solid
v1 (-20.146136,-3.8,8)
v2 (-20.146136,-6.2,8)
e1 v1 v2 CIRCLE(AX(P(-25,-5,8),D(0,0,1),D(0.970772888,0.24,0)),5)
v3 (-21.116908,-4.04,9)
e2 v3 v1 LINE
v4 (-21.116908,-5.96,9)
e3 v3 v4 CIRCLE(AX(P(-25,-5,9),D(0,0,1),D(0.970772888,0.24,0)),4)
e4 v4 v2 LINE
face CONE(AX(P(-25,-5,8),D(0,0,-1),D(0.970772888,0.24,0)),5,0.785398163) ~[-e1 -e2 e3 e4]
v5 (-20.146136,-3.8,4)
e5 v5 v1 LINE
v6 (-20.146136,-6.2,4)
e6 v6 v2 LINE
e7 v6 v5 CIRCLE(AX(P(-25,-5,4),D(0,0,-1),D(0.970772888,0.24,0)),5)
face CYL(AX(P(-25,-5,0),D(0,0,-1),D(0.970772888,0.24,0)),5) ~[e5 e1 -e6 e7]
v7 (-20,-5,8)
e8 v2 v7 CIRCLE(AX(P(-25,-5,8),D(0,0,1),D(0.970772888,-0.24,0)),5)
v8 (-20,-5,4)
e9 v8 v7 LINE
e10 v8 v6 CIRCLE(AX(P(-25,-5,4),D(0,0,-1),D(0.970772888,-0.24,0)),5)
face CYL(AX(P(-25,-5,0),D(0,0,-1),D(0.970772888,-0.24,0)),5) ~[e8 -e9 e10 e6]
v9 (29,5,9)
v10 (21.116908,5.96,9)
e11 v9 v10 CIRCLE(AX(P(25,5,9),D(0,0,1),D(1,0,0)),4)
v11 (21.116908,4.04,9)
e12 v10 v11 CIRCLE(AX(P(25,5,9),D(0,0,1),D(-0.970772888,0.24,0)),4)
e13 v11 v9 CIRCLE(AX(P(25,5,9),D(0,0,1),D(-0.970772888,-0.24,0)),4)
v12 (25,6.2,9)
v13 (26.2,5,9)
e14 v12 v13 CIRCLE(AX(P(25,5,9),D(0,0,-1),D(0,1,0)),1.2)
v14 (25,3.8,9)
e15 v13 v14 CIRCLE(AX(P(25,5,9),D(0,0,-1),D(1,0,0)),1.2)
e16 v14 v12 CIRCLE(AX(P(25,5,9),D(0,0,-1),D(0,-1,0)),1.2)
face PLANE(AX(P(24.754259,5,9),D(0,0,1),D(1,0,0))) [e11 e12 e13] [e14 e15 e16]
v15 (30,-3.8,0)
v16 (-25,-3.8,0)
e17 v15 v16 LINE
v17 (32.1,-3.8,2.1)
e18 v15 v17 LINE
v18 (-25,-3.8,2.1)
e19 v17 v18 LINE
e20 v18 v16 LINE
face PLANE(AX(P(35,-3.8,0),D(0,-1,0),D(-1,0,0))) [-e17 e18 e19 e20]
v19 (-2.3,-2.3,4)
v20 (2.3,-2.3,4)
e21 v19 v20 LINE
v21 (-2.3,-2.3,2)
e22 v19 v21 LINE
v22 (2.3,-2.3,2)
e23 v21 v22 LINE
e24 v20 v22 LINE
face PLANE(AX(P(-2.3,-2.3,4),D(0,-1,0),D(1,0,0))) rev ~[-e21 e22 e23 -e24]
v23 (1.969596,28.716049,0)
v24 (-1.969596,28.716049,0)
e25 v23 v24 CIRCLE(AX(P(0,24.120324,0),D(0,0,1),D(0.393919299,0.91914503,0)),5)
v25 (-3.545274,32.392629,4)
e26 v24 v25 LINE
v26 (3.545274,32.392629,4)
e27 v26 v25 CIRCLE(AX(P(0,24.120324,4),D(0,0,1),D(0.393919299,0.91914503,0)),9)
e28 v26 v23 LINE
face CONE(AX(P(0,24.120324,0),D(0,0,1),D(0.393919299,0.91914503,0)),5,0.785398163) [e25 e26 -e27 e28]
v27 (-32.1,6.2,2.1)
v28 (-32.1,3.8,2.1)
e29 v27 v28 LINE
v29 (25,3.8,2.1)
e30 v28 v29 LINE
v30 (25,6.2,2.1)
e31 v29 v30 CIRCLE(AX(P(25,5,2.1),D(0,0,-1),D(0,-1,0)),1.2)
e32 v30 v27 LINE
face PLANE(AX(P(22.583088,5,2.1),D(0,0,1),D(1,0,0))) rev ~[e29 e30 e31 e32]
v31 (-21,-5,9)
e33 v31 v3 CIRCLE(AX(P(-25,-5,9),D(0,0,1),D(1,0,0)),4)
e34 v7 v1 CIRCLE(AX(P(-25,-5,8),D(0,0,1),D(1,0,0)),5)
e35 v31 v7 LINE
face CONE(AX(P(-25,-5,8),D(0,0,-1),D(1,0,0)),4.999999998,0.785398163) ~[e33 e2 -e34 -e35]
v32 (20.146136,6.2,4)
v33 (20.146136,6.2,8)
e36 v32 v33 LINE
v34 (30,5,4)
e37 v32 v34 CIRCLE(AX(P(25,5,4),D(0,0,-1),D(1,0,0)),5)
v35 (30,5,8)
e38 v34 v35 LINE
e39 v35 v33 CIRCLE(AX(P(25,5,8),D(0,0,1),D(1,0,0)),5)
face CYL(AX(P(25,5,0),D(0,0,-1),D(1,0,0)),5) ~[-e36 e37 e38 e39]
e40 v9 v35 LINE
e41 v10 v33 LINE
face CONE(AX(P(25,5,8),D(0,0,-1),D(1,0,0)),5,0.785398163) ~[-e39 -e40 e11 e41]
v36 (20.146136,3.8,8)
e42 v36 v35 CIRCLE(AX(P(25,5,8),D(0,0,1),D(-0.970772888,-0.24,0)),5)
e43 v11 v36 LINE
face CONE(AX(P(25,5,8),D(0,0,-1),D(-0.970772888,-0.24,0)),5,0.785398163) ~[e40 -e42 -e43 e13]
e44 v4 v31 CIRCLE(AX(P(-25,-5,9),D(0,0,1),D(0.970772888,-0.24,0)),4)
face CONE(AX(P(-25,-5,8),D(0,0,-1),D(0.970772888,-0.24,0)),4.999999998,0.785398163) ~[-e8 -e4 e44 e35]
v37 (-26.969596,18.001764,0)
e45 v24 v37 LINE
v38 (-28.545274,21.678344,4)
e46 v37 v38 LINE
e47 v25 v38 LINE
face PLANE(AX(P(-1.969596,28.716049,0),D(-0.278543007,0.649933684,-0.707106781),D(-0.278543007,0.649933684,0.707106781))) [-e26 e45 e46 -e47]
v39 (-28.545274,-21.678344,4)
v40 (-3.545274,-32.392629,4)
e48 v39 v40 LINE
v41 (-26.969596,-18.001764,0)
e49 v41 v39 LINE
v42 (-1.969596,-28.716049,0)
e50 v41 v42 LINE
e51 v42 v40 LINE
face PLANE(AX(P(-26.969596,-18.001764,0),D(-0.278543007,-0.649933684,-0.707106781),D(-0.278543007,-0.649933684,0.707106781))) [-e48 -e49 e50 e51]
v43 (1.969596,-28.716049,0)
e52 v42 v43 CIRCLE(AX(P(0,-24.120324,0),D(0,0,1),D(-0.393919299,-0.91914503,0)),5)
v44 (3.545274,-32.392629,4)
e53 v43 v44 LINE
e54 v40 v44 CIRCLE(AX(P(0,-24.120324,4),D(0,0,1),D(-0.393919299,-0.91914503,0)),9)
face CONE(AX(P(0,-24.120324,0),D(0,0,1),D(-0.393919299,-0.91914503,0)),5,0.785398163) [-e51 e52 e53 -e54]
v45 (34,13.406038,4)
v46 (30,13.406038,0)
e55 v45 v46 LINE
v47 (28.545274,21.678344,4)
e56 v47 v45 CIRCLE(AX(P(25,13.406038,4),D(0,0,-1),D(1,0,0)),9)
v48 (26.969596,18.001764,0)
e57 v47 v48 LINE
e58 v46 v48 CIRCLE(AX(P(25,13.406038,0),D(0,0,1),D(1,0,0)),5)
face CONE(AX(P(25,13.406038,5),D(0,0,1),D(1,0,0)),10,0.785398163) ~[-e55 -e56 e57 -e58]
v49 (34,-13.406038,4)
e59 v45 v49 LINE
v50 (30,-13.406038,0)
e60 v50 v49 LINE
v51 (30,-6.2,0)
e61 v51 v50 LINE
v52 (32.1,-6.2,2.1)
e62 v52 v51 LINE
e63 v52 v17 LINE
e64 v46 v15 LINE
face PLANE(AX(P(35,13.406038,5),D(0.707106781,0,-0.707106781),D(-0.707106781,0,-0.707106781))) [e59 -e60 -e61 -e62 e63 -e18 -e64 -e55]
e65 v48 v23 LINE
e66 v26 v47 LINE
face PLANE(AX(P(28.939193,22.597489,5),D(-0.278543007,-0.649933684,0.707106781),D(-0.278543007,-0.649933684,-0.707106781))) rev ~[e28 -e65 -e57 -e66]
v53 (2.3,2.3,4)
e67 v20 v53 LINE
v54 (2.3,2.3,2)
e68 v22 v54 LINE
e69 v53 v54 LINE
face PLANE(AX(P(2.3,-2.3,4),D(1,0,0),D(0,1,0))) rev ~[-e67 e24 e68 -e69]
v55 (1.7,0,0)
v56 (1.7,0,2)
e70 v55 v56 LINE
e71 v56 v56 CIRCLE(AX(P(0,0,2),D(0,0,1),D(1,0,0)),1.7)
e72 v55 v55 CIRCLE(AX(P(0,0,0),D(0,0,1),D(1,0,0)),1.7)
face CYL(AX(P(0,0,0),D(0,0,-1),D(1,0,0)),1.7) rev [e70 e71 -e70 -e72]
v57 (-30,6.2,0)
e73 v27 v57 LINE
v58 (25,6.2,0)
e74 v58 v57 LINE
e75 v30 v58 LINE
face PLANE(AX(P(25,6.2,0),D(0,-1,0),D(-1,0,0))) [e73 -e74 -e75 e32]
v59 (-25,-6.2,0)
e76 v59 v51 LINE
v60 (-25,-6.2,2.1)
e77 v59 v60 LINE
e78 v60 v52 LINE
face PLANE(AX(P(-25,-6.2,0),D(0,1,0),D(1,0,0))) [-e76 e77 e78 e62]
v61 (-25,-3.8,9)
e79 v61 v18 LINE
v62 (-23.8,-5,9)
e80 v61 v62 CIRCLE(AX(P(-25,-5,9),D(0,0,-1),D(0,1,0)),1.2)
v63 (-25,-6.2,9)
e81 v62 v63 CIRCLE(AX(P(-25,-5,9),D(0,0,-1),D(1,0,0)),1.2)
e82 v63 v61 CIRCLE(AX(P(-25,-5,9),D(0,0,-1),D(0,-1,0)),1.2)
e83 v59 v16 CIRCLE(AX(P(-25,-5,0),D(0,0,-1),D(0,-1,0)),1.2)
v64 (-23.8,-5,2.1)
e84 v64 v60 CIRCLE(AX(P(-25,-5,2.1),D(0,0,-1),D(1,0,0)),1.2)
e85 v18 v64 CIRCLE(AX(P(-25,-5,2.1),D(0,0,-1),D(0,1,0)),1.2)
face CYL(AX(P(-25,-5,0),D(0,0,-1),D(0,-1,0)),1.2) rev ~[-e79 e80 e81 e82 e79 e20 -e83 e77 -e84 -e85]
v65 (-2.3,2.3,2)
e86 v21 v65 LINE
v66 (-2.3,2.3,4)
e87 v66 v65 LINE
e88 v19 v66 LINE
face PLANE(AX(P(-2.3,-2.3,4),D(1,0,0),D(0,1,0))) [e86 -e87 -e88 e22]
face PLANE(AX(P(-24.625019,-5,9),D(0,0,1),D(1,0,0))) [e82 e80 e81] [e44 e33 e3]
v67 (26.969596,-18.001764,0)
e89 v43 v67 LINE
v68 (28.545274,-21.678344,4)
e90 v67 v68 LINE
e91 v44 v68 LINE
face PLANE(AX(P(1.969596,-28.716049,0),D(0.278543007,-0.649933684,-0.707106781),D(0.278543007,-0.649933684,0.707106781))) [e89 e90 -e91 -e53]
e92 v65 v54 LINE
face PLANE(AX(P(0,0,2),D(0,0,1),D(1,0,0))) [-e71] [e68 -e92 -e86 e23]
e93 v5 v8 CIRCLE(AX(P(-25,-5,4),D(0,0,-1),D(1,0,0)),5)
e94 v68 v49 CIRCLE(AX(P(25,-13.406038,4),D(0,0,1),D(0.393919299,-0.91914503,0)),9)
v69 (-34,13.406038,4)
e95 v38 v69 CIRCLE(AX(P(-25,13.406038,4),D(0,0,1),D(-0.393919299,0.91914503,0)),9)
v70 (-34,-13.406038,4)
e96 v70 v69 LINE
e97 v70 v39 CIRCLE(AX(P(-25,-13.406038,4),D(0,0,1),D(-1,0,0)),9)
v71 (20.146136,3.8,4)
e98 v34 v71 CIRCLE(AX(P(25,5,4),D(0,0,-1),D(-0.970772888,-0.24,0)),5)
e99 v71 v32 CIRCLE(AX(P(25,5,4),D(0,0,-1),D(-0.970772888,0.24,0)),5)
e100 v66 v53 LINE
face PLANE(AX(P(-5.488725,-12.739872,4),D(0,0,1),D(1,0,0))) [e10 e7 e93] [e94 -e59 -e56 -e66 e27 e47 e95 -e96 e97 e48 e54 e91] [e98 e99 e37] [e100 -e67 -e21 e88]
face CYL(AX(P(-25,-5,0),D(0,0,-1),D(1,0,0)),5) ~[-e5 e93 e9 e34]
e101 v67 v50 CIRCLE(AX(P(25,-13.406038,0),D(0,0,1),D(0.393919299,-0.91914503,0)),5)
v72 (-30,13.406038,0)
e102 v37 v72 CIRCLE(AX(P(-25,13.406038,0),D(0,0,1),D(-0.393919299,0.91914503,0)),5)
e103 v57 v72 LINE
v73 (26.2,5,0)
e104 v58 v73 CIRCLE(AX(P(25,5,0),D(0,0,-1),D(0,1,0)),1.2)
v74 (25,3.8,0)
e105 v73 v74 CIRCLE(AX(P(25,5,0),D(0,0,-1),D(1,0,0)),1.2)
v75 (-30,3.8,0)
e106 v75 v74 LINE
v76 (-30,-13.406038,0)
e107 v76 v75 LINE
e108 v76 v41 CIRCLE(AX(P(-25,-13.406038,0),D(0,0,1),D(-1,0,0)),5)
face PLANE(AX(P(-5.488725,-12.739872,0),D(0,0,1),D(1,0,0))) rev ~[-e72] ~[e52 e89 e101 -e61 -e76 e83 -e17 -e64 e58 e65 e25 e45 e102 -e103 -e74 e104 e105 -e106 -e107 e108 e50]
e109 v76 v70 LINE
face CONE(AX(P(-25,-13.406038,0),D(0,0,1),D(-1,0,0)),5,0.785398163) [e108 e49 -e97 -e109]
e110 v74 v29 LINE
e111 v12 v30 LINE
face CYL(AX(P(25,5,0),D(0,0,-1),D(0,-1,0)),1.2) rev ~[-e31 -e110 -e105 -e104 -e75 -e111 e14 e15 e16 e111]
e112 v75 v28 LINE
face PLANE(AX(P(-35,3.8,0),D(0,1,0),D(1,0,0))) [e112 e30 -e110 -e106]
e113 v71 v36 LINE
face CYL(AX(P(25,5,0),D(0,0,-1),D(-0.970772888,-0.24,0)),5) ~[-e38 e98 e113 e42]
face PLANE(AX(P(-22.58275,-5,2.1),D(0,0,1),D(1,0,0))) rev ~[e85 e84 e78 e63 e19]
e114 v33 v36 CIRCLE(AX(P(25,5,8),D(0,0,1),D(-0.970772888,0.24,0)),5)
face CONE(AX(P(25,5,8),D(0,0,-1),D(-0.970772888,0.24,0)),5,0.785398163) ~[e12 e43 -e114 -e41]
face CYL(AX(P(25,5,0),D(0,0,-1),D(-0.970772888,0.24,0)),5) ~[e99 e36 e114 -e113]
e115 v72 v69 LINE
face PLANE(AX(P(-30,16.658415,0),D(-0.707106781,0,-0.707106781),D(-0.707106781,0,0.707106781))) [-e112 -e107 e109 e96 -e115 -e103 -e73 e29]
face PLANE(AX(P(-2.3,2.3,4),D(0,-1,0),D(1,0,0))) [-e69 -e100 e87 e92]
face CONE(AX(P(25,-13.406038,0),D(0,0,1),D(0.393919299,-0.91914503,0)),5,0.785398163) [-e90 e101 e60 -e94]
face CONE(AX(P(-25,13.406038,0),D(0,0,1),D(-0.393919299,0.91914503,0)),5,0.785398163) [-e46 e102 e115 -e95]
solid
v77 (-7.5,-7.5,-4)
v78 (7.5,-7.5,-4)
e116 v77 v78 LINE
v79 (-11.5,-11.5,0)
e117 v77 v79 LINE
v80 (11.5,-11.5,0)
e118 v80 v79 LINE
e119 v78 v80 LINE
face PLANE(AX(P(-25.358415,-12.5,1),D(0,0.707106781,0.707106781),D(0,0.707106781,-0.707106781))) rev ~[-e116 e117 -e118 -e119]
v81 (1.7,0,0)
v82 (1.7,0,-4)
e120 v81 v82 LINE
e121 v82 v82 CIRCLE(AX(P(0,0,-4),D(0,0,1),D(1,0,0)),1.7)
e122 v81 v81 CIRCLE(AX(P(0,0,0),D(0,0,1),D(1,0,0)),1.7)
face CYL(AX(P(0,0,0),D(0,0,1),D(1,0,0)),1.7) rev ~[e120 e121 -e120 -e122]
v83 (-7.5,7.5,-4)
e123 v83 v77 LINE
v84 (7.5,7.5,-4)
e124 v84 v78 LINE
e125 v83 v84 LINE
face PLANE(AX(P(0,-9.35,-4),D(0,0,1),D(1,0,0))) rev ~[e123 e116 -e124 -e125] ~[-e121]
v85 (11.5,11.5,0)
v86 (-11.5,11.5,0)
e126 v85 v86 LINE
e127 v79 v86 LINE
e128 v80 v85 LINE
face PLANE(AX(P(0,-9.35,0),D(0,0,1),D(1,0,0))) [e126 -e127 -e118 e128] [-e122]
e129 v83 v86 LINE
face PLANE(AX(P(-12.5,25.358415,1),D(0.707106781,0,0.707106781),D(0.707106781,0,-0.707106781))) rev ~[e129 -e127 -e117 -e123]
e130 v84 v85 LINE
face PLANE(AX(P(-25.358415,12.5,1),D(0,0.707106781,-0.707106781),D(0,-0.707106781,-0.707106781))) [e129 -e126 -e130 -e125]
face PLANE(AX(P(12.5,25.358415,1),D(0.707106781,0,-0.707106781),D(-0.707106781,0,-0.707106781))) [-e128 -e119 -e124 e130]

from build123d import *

# Parameters (mm, degrees)
F0_W           = 25
F0_H           = 6.3
F0_H_2         = 2.4
F0_H_3         = 7.6
F0_R           = 1.7
F0_W_2         = 22.5
F1_DEPTH       = 4
F2_DEPTH       = 9
F3_DEPTH       = 2.1
F4_DEPTH       = 4
F5_T1_DEPTH    = 50.7168298797
F5_T3_DEPTH    = 50.7168298797
F5_2_T1_DEPTH  = 27.1991896638
F5_2_T3_DEPTH  = 20.06445336
F5_2_T5_DEPTH  = 27.1991896638
F5_2_T7_DEPTH  = 30.06445336
F5_2_T9_DEPTH  = 27.1991896638
F5_2_T11_DEPTH = 20.06445336
F5_2_T13_DEPTH = 27.1991896638
F5_2_T15_DEPTH = 30.06445336
F5_2_T18_ANGLE = 66.8014094864
F5_2_T20_ANGLE = 46.3971810273
F5_2_T22_ANGLE = 66.8014094864
F5_2_T24_ANGLE = 66.8014094864
F5_2_T26_ANGLE = 46.3971810273
F5_2_T28_ANGLE = 66.8014094864
F6_SIZE        = 1
F7_W           = 4.6
F7_H           = 4.6
F7_R           = 1.7
F8_DEPTH       = 2


# Not quite as in the source:
# - a fillet or chamfer that OpenCascade refuses, or shapes differently, is made with other operations: its cross-section is extruded or revolved along the edge and cut away or added


with BuildPart() as f1:
    # F0 (on Top) → F1 (new body)
    with BuildSketch(Plane.XY):
        with BuildLine():
            Line((-12.5, -3.8), (-12.5, 3.8))
            Line((-12.5, 3.8), (-35, 3.8))
            Line((-35, 3.8), (-35, 0.3032439272))
            Line((-35, 0.3032439272), (-35, -0.3032439272))
            Line((-35, -0.3032439272), (-35, -13.4060384202))
            ThreePointArc((-35, -13.4060384202), (-33.3484109224, -18.9109485077), (-28.9391929858, -22.5974887204))
            Line((-28.9391929858, -22.5974887204), (-3.9391929858, -33.3117744347))
            ThreePointArc((-3.9391929858, -33.3117744347), (0, -34.1203241345), (3.9391929858, -33.3117744347))
            Line((3.9391929858, -33.3117744347), (28.9391929858, -22.5974887204))
            ThreePointArc((28.9391929858, -22.5974887204), (33.3484109224, -18.9109485077), (35, -13.4060384202))
            Line((35, -13.4060384202), (35, -6.2))
            Line((35, -6.2), (12.5, -6.2))
            Line((12.5, -6.2), (12.5, -12.5))
            Line((12.5, -12.5), (-12.5, -12.5))
            Line((-12.5, -12.5), (-12.5, -6.2))
            Line((-12.5, -6.2), (-20.1461355602, -6.2))
            ThreePointArc((-20.1461355602, -6.2), (-30, -5), (-20.1461355602, -3.8))
            Line((-20.1461355602, -3.8), (-12.5, -3.8))
        make_face()
        with BuildLine():
            ThreePointArc((20.1461355602, 6.2), (25.6044327096, 9.9633316532), (30, 5))
            ThreePointArc((30, 5), (25.6044327096, 0.0366683468), (20.1461355602, 3.8))
            Line((20.1461355602, 3.8), (12.5, 3.8))
            Line((12.5, 3.8), (12.5, -3.8))
            Line((12.5, -3.8), (35, -3.8))
            Line((35, -3.8), (35, -0.49606018))
            Line((35, -0.49606018), (35, 0.49606018))
            Line((35, 0.49606018), (35, 13.4060384202))
            ThreePointArc((35, 13.4060384202), (33.3484109224, 18.9109485077), (28.9391929858, 22.5974887204))
            Line((28.9391929858, 22.5974887204), (3.9391929858, 33.3117744347))
            ThreePointArc((3.9391929858, 33.3117744347), (0, 34.1203241345), (-3.9391929858, 33.3117744347))
            Line((-3.9391929858, 33.3117744347), (-28.9391929858, 22.5974887204))
            ThreePointArc((-28.9391929858, 22.5974887204), (-33.3484109224, 18.9109485077), (-35, 13.4060384202))
            Line((-35, 13.4060384202), (-35, 6.2))
            Line((-35, 6.2), (-12.5, 6.2))
            Line((-12.5, 6.2), (-12.5, 12.5))
            Line((-12.5, 12.5), (12.5, 12.5))
            Line((12.5, 12.5), (12.5, 6.2))
            Line((12.5, 6.2), (20.1461355602, 6.2))
        make_face()
        with BuildLine():
            ThreePointArc((20.1461355602, 3.8), (25.6044327096, 0.0366683468), (30, 5))
            ThreePointArc((30, 5), (25.6044327096, 9.9633316532), (20.1461355602, 6.2))
            Line((20.1461355602, 6.2), (25, 6.2))
            ThreePointArc((25, 6.2), (25.8485281374, 5.8485281374), (26.2, 5))
            ThreePointArc((26.2, 5), (25.8485281374, 4.1514718626), (25, 3.8))
            Line((25, 3.8), (20.1461355602, 3.8))
        make_face()
        with BuildLine():
            Line((25, 6.2), (20.1461355602, 6.2))
            ThreePointArc((20.1461355602, 6.2), (20, 5), (20.1461355602, 3.8))
            Line((20.1461355602, 3.8), (25, 3.8))
            ThreePointArc((25, 3.8), (23.8, 5), (25, 6.2))
        make_face()
        with BuildLine():
            ThreePointArc((20.1461355602, 3.8), (20, 5), (20.1461355602, 6.2))
            Line((20.1461355602, 6.2), (12.5, 6.2))
            Line((12.5, 6.2), (12.5, 3.8))
            Line((12.5, 3.8), (20.1461355602, 3.8))
        make_face()
        with Locations((0, 9.35)):
            Rectangle(F0_W, F0_H)
        with Locations((0, 5)):
            Rectangle(F0_W, F0_H_2)
        Rectangle(F0_W, F0_H_3)
        Circle(F0_R, mode=Mode.SUBTRACT)
        with Locations((-23.75, 5)):
            Rectangle(F0_W_2, F0_H_2)
        with BuildLine():
            Line((-25, -3.8), (-20.1461355602, -3.8))
            ThreePointArc((-20.1461355602, -3.8), (-30, -5), (-20.1461355602, -6.2))
            Line((-20.1461355602, -6.2), (-25, -6.2))
            ThreePointArc((-25, -6.2), (-26.2, -5), (-25, -3.8))
        make_face()
        with BuildLine():
            ThreePointArc((-20, -5), (-20.0366683468, -4.3955672904), (-20.1461355602, -3.8))
            Line((-20.1461355602, -3.8), (-25, -3.8))
            ThreePointArc((-25, -3.8), (-24.1514718626, -4.1514718626), (-23.8, -5))
            ThreePointArc((-23.8, -5), (-24.1514718626, -5.8485281374), (-25, -6.2))
            Line((-25, -6.2), (-20.1461355602, -6.2))
            ThreePointArc((-20.1461355602, -6.2), (-20.0366683468, -5.6044327096), (-20, -5))
        make_face()
        with Locations((23.75, -5)):
            Rectangle(F0_W_2, F0_H_2)
        with Locations((0, -9.35)):
            Rectangle(F0_W, F0_H)
        with BuildLine():
            Line((-12.5, -6.2), (-12.5, -3.8))
            Line((-12.5, -3.8), (-20.1461355602, -3.8))
            ThreePointArc((-20.1461355602, -3.8), (-20.0366683468, -4.3955672904), (-20, -5))
            ThreePointArc((-20, -5), (-20.0366683468, -5.6044327096), (-20.1461355602, -6.2))
            Line((-20.1461355602, -6.2), (-12.5, -6.2))
        make_face()
        with Locations((0, -5)):
            Rectangle(F0_W, F0_H_2)
    extrude(amount=F1_DEPTH)

    # F0 (on Top) → F2 (join)
    with BuildSketch(Plane.XY):
        with BuildLine():
            Line((-25, -3.8), (-20.1461355602, -3.8))
            ThreePointArc((-20.1461355602, -3.8), (-30, -5), (-20.1461355602, -6.2))
            Line((-20.1461355602, -6.2), (-25, -6.2))
            ThreePointArc((-25, -6.2), (-26.2, -5), (-25, -3.8))
        make_face()
        with BuildLine():
            ThreePointArc((20.1461355602, 3.8), (25.6044327096, 0.0366683468), (30, 5))
            ThreePointArc((30, 5), (25.6044327096, 9.9633316532), (20.1461355602, 6.2))
            Line((20.1461355602, 6.2), (25, 6.2))
            ThreePointArc((25, 6.2), (25.8485281374, 5.8485281374), (26.2, 5))
            ThreePointArc((26.2, 5), (25.8485281374, 4.1514718626), (25, 3.8))
            Line((25, 3.8), (20.1461355602, 3.8))
        make_face()
        with BuildLine():
            Line((25, 6.2), (20.1461355602, 6.2))
            ThreePointArc((20.1461355602, 6.2), (20, 5), (20.1461355602, 3.8))
            Line((20.1461355602, 3.8), (25, 3.8))
            ThreePointArc((25, 3.8), (23.8, 5), (25, 6.2))
        make_face()
        with BuildLine():
            ThreePointArc((-20, -5), (-20.0366683468, -4.3955672904), (-20.1461355602, -3.8))
            Line((-20.1461355602, -3.8), (-25, -3.8))
            ThreePointArc((-25, -3.8), (-24.1514718626, -4.1514718626), (-23.8, -5))
            ThreePointArc((-23.8, -5), (-24.1514718626, -5.8485281374), (-25, -6.2))
            Line((-25, -6.2), (-20.1461355602, -6.2))
            ThreePointArc((-20.1461355602, -6.2), (-20.0366683468, -5.6044327096), (-20, -5))
        make_face()
    extrude(amount=F2_DEPTH)

    # F0 (on Top) → F3 (cut)
    with BuildSketch(Plane.XY):
        with BuildLine():
            ThreePointArc((-20, -5), (-20.0366683468, -4.3955672904), (-20.1461355602, -3.8))
            Line((-20.1461355602, -3.8), (-25, -3.8))
            ThreePointArc((-25, -3.8), (-24.1514718626, -4.1514718626), (-23.8, -5))
            ThreePointArc((-23.8, -5), (-24.1514718626, -5.8485281374), (-25, -6.2))
            Line((-25, -6.2), (-20.1461355602, -6.2))
            ThreePointArc((-20.1461355602, -6.2), (-20.0366683468, -5.6044327096), (-20, -5))
        make_face()
        with BuildLine():
            Line((-12.5, -6.2), (-12.5, -3.8))
            Line((-12.5, -3.8), (-20.1461355602, -3.8))
            ThreePointArc((-20.1461355602, -3.8), (-20.0366683468, -4.3955672904), (-20, -5))
            ThreePointArc((-20, -5), (-20.0366683468, -5.6044327096), (-20.1461355602, -6.2))
            Line((-20.1461355602, -6.2), (-12.5, -6.2))
        make_face()
        with Locations((0, -5)):
            Rectangle(F0_W, F0_H_2)
        with Locations((23.75, -5)):
            Rectangle(F0_W_2, F0_H_2)
        with BuildLine():
            Line((25, 6.2), (20.1461355602, 6.2))
            ThreePointArc((20.1461355602, 6.2), (20, 5), (20.1461355602, 3.8))
            Line((20.1461355602, 3.8), (25, 3.8))
            ThreePointArc((25, 3.8), (23.8, 5), (25, 6.2))
        make_face()
        with BuildLine():
            ThreePointArc((20.1461355602, 3.8), (20, 5), (20.1461355602, 6.2))
            Line((20.1461355602, 6.2), (12.5, 6.2))
            Line((12.5, 6.2), (12.5, 3.8))
            Line((12.5, 3.8), (20.1461355602, 3.8))
        make_face()
        with Locations((0, 5)):
            Rectangle(F0_W, F0_H_2)
        with Locations((-23.75, 5)):
            Rectangle(F0_W_2, F0_H_2)
    extrude(amount=F3_DEPTH, mode=Mode.SUBTRACT)

    # F5#2: chamfer of 5 on 2 edges, made by hand

    # F5_2_s2 → F5_2_t1 (cut)
    with BuildSketch(Plane(origin=(8.7332208073, 3.7428089174, 0), x_dir=(0, 0, 1), z_dir=(-0.91914503, -0.3939192986, 0))):
        Polygon((0, 27.1700760506), (5, 32.1700760506), (0, 32.1700760506), align=None)
    extrude(amount=F5_2_T1_DEPTH, mode=Mode.SUBTRACT)

    # F5_2_s4 → F5_2_t3 (cut)
    with BuildSketch(Plane.XZ.offset(-13.4060384202)):
        Polygon((-30, 0), (-35, 5), (-35, 0), align=None)
    extrude(amount=F5_2_T3_DEPTH, mode=Mode.SUBTRACT)

    # F5_2_s6 → F5_2_t5 (cut)
    with BuildSketch(Plane(origin=(16.2667791927, -6.9714767969, 0), x_dir=(0, 0, 1), z_dir=(-0.91914503, 0.3939192986, 0))):
        Polygon((5, 32.1700760506), (0, 27.1700760506), (0, 32.1700760506), align=None)
    extrude(amount=F5_2_T5_DEPTH, mode=Mode.SUBTRACT)

    # F5_2_s8 → F5_2_t7 (cut)
    with BuildSketch(Plane.XZ.offset(-13.4060384202)):
        Polygon((35, 5), (30, 0), (35, 0), align=None)
    extrude(amount=F5_2_T7_DEPTH, mode=Mode.SUBTRACT)

    # F5_2_s10 → F5_2_t9 (cut)
    with BuildSketch(Plane(origin=(-8.7332208073, -3.7428089174, 0), x_dir=(0, 0, 1), z_dir=(0.91914503, 0.3939192986, 0))):
        Polygon((0, 27.1700760506), (5, 32.1700760506), (0, 32.1700760506), align=None)
    extrude(amount=F5_2_T9_DEPTH, mode=Mode.SUBTRACT)

    # F5_2_s12 → F5_2_t11 (cut)
    with BuildSketch(Plane.XZ.offset(-6.6584149398)):
        Polygon((35, 5), (30, 0), (35, 0), align=None)
    extrude(amount=F5_2_T11_DEPTH, mode=Mode.SUBTRACT)

    # F5_2_s14 → F5_2_t13 (cut)
    with BuildSketch(Plane(origin=(-16.2667791927, 6.9714767969, 0), x_dir=(0, 0, 1), z_dir=(0.91914503, -0.3939192986, 0))):
        Polygon((0, 27.1700760506), (5, 32.1700760506), (0, 32.1700760506), align=None)
    extrude(amount=F5_2_T13_DEPTH, mode=Mode.SUBTRACT)

    # F5_2_s16 → F5_2_t15 (cut)
    with BuildSketch(Plane.XZ.offset(-16.6584149398)):
        Polygon((-30, 0), (-35, 5), (-35, 0), align=None)
    extrude(amount=F5_2_T15_DEPTH, mode=Mode.SUBTRACT)

    # F5_2_s17 → F5_2_t18 (revolve, cut)
    with BuildSketch(Plane(origin=(16.2667791927, 6.9714767969, 0), x_dir=(0, 0, 1), z_dir=(-0.91914503, -0.3939192986, 0))):
        Polygon((0, -27.1700760506), (5, -32.1700760506), (0, -32.1700760506), align=None)
    revolve(axis=Axis((25, -13.4060384202, 0), (0, 0, 1)), revolution_arc=F5_2_T18_ANGLE, mode=Mode.SUBTRACT)

    # F5_2_s19 → F5_2_t20 (revolve, cut)
    with BuildSketch(Plane(origin=(-8.7332208073, 3.7428089174, 0), x_dir=(0, 0, 1), z_dir=(0.91914503, -0.3939192986, 0))):
        Polygon((0, -27.1700760506), (5, -32.1700760506), (0, -32.1700760506), align=None)
    revolve(axis=Axis((0, 24.1203241345, 0), (0, 0, 1)), revolution_arc=F5_2_T20_ANGLE, mode=Mode.SUBTRACT)

    # F5_2_s21 → F5_2_t22 (revolve, cut)
    with BuildSketch(Plane(origin=(-16.2667791927, -6.9714767969, 0), x_dir=(0, 0, 1), z_dir=(0.91914503, 0.3939192986, 0))):
        Polygon((0, -27.1700760506), (5, -32.1700760506), (0, -32.1700760506), align=None)
    revolve(axis=Axis((-25, 13.4060384202, 0), (0, 0, 1)), revolution_arc=F5_2_T22_ANGLE, mode=Mode.SUBTRACT)

    # F5_2_s23 → F5_2_t24 (revolve, cut)
    with BuildSketch(Plane.XZ.offset(-13.4060384202)):
        Polygon((35, 5), (30, 0), (35, 0), align=None)
    revolve(axis=Axis((25, 13.4060384202, 0), (0, 0, 1)), revolution_arc=F5_2_T24_ANGLE, mode=Mode.SUBTRACT)

    # F5_2_s25 → F5_2_t26 (revolve, cut)
    with BuildSketch(Plane(origin=(8.7332208073, -3.7428089174, 0), x_dir=(0, 0, 1), z_dir=(-0.91914503, 0.3939192986, 0))):
        Polygon((0, -27.1700760506), (5, -32.1700760506), (0, -32.1700760506), align=None)
    revolve(axis=Axis((0, -24.1203241345, 0), (0, 0, 1)), revolution_arc=F5_2_T26_ANGLE, mode=Mode.SUBTRACT)

    # F5_2_s27 → F5_2_t28 (revolve, cut)
    with BuildSketch(Plane.XZ.offset(13.4060384202)):
        Polygon((-30, 0), (-35, 5), (-35, 0), align=None)
    revolve(axis=Axis((-25, -13.4060384202, 0), (0, 0, 1)), revolution_arc=F5_2_T28_ANGLE, mode=Mode.SUBTRACT)

    # F6
    f6_edges = [f1.edges().sort_by_distance(p)[0] for p in [
        (29.853864, 3.8, 9),
        (-29.853864, -3.8, 9),
    ]]
    chamfer(f6_edges, length=F6_SIZE)

    # F7 (on face) → F8 (cut)
    with BuildSketch(Plane.XY.offset(4)):
        Rectangle(F7_W, F7_H)
        Circle(F7_R, mode=Mode.SUBTRACT)
    extrude(amount=-F8_DEPTH, mode=Mode.SUBTRACT)


with BuildPart() as f4:
    # F0 (on Top) → F4 (new body)
    with BuildSketch(Plane.XY):
        with Locations((0, -9.35)):
            Rectangle(F0_W, F0_H)
        with Locations((0, -5)):
            Rectangle(F0_W, F0_H_2)
        Rectangle(F0_W, F0_H_3)
        Circle(F0_R, mode=Mode.SUBTRACT)
        with Locations((0, 5)):
            Rectangle(F0_W, F0_H_2)
        with Locations((0, 9.35)):
            Rectangle(F0_W, F0_H)
    extrude(amount=-F4_DEPTH)

    # F5: chamfer of 5 on 4 edges, made by hand

    # F5_s2 → F5_t1 (cut)
    with BuildSketch(Plane.XZ.offset(-25.3584149398)):
        Polygon((12.5, 1), (7.5, -4), (12.5, -4), align=None)
        Polygon((-12.5, 1), (-7.5, -4), (-12.5, -4), align=None)
    extrude(amount=F5_T1_DEPTH, mode=Mode.SUBTRACT)

    # F5_s4 → F5_t3 (cut)
    with BuildSketch(Plane.YZ.offset(-25.3584149398)):
        Polygon((-12.5, 1), (-7.5, -4), (-12.5, -4), align=None)
        Polygon((12.5, 1), (7.5, -4), (12.5, -4), align=None)
    extrude(amount=F5_T3_DEPTH, mode=Mode.SUBTRACT)


solid = Compound([f1.part, f4.part])
